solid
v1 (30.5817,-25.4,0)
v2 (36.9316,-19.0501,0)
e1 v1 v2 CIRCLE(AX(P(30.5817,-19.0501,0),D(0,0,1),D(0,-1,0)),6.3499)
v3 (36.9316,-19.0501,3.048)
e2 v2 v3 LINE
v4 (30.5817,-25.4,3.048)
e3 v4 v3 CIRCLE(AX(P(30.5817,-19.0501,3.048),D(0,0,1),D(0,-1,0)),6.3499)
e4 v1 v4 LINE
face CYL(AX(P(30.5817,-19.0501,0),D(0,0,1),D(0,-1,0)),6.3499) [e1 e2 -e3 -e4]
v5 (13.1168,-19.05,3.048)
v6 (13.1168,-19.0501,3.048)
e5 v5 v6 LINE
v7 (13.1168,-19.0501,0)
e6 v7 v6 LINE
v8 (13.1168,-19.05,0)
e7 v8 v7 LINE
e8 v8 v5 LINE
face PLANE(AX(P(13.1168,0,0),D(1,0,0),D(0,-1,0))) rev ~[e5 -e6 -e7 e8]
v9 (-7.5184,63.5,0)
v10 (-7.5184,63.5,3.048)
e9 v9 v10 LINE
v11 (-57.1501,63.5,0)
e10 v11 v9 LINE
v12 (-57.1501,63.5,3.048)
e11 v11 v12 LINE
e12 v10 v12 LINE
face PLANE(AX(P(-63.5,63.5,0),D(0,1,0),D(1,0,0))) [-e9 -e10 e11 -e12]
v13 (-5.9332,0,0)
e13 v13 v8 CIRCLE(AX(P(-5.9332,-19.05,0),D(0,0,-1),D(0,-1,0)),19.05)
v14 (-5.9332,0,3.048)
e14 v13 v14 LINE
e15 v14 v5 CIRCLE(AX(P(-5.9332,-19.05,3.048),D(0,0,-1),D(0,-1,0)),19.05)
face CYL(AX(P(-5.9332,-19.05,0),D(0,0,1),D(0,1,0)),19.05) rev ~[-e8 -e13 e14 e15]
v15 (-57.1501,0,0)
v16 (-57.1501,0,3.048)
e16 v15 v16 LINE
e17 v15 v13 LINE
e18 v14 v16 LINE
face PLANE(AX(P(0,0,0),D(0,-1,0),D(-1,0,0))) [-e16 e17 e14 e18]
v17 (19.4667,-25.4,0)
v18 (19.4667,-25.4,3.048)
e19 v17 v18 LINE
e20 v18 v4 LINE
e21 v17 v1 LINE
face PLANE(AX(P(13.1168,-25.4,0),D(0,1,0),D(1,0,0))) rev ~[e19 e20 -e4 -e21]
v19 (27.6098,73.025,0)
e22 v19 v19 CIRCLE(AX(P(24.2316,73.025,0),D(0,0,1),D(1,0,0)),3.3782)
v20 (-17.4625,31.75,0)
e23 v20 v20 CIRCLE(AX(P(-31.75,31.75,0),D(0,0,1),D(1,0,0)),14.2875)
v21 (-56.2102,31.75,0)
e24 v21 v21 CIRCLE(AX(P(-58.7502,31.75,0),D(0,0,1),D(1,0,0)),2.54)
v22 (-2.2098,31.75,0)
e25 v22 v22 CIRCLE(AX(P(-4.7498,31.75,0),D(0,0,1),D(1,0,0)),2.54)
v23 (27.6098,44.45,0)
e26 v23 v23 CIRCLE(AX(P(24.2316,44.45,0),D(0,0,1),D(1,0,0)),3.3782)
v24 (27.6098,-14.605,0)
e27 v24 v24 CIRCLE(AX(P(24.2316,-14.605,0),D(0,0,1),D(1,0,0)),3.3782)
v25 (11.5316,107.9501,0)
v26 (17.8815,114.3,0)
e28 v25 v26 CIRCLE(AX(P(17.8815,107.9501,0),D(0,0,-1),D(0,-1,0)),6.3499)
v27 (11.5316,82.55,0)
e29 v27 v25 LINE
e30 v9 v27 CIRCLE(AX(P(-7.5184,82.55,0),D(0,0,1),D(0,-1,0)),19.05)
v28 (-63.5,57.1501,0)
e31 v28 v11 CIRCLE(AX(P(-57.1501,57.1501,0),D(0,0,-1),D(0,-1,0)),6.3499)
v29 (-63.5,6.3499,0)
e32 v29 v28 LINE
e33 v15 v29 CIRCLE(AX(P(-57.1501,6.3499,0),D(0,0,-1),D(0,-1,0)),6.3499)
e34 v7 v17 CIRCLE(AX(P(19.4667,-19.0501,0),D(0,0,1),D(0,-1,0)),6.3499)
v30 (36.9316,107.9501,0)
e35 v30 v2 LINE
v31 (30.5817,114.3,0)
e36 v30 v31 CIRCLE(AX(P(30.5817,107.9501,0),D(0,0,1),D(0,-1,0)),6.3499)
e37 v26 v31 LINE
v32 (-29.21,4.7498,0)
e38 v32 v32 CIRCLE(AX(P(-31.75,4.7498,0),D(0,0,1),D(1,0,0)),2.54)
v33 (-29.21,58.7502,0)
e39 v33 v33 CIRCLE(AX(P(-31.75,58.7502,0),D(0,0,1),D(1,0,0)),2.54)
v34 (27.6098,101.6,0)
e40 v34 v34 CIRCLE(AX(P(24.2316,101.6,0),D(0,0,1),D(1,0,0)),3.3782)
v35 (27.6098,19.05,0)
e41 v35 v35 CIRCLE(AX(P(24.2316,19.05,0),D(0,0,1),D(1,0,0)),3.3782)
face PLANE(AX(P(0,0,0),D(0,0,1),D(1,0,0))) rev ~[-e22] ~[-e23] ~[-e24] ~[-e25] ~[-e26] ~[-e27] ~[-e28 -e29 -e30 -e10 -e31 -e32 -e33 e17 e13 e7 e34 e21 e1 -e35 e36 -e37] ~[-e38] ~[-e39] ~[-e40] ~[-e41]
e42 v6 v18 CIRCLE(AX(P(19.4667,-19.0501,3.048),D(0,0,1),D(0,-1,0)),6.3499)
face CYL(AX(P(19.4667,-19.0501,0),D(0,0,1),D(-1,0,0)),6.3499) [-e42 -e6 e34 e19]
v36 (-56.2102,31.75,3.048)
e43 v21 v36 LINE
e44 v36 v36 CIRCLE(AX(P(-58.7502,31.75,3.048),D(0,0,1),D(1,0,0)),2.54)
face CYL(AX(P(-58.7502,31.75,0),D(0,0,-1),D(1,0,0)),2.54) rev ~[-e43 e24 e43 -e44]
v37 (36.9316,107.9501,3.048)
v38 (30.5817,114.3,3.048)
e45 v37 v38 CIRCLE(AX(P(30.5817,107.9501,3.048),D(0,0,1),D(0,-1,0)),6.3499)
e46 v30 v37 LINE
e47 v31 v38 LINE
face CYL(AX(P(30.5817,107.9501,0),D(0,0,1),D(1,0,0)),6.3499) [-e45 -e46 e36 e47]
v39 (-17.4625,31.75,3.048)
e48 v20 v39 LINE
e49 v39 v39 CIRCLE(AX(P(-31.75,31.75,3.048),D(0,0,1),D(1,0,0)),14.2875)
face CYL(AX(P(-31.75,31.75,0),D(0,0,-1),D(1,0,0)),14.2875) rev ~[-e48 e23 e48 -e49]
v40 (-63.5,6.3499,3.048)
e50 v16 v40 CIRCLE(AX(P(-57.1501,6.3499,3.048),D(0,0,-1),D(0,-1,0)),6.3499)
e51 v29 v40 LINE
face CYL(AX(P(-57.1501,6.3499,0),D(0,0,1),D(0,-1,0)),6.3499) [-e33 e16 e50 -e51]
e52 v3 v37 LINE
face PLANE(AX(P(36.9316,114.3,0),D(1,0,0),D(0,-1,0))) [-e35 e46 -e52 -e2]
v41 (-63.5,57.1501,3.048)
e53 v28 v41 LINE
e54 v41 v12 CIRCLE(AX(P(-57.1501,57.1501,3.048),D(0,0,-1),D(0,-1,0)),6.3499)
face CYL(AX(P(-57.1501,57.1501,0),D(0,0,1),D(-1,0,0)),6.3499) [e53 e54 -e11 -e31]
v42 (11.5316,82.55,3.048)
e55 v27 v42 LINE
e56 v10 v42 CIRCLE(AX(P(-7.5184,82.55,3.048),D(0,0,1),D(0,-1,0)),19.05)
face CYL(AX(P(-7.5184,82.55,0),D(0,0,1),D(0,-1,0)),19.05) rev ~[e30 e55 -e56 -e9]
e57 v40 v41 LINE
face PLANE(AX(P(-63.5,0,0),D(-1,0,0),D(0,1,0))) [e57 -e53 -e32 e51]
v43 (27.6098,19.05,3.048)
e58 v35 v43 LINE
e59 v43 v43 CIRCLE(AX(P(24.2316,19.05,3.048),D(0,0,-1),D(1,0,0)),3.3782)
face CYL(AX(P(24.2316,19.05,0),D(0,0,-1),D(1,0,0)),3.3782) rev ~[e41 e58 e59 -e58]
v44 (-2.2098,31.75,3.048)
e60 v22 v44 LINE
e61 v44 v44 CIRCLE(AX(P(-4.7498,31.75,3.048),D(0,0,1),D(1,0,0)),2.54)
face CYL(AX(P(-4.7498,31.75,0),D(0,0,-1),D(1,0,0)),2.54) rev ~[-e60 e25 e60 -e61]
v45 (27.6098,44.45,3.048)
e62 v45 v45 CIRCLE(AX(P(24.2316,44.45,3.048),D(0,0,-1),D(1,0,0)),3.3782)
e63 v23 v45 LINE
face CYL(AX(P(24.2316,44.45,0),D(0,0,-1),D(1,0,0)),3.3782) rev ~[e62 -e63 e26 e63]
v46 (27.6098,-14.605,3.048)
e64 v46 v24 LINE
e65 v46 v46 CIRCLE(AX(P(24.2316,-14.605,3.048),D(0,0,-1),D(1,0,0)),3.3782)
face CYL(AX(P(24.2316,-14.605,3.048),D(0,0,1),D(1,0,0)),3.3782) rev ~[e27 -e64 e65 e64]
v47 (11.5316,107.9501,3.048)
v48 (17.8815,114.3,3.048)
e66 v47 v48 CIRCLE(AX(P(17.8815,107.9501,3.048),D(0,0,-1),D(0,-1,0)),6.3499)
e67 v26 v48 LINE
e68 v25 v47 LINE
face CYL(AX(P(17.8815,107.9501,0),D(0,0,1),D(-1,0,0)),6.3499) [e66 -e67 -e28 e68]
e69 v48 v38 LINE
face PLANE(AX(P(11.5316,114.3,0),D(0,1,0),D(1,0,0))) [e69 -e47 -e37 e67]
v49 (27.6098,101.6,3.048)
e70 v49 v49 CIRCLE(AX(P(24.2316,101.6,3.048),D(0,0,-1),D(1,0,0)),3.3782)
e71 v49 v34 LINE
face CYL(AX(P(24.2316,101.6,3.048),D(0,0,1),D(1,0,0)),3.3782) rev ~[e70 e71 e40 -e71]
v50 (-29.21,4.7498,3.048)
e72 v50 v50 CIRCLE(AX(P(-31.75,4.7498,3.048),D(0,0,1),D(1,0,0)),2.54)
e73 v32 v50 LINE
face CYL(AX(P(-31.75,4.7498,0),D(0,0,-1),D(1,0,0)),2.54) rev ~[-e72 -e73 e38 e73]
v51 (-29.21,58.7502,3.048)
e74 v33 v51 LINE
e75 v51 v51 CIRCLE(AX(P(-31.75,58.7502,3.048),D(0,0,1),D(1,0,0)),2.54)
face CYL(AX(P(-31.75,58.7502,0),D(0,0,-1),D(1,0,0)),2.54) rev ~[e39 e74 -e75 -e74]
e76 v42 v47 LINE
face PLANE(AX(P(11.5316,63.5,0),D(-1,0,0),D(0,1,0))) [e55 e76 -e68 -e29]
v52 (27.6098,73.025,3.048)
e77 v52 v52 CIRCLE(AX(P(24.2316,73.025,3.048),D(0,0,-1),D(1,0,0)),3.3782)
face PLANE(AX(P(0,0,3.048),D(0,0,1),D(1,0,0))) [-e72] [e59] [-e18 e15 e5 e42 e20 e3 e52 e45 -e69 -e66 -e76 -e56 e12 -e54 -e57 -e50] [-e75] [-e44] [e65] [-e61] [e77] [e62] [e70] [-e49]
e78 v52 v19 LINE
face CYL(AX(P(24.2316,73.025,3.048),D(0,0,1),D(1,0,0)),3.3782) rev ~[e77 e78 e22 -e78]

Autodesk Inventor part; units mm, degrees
ref_plane "YZ Plane" through (0, 0, 0) normal (1, 0, 0) x (0, 1, 0)
ref_plane "XZ Plane" through (0, 0, 0) normal (0, 1, 0) x (-1, 0, 0)
ref_plane "XY Plane" through (0, 0, 0) normal (0, 0, 1) x (1, 0, 0)
sketch "Sketch1" plane through (0, 0, 0) normal (0, 0, 1) x (1, 0, 0)
  line L0 (0, 0) -> (-63.5, 0)
  line L1 (-63.5, 0) -> (-63.5, 63.5)
  line L2 (-63.5, 63.5) -> (0, 63.5)
  circle A0 centre (-58.7502, 31.75) radius 2.54
  circle A1 centre (-31.75, 58.7502) radius 2.54
  circle A2 centre (-4.7498, 31.75) radius 2.54
  circle A3 centre (-31.75, 4.7498) radius 2.54
  line L3 (36.9316, 63.5) -> (36.9316, 0)
  line L4 (13.1168, 0) -> (0, 0)
  circle A4 centre (-31.75, 31.75) radius 14.2875
  line L5 (24.2316, 63.5) -> (24.2316, 44.45)
  line L6 (24.2316, 44.45) -> (24.2316, 19.05)
  circle A5 centre (24.2316, 44.45) radius 3.3782
  circle A6 centre (24.2316, 19.05) radius 3.3782
  line L7 (20.8534, 44.45) -> (20.8534, 19.05)
  line L8 (27.6098, 19.05) -> (27.6098, 44.45)
  line L9 (11.5316, 63.5) -> (11.5316, 114.3)
  line L10 (13.1168, 0) -> (13.1168, -25.4)
  line L11 (13.1168, -25.4) -> (36.9316, -25.4)
  line L12 (36.9316, -25.4) -> (36.9316, 0)
  line L13 (11.5316, 114.3) -> (36.9316, 114.3)
  line L14 (36.9316, 114.3) -> (36.9316, 63.5)
  line L15 (0, 63.5) -> (11.5316, 63.5)
  dimension "d0" = 63.5
  dimension "d1" = 63.5
  dimension "d6" = 5.08
  dimension "d7" = 5.08
  dimension "d8" = 5.08
  dimension "d9" = 5.08
  dimension "d11" = 36.9316
  dimension "d12" = 28.575
  dimension "d13" = 12.7
  dimension "d15" = 25.4
  dimension "d16" = 6.7564
  dimension "d17" = 6.7564
  dimension "d23" = 50.8
  dimension "d24" = 25.4
extrude "Plate2" add sketch "Sketch1" along normal blind 3.048 contours L0 L1 L2 L15 L9 L13 L14 L3 L12 L11 L10 L4 | L8 A6 L6 A5 | A5 L6 A6 L7
sketch "Sketch4" plane through (0, 0, 3.048) normal (0, 0, 1) x (1, 0, 0)
  circle A0 centre (24.2316, 19.05) radius 3.3782 projected
  circle A1 centre (24.2316, 44.45) radius 3.3782 projected
  line L0 (-63.5, 63.5) -> (11.5316, 63.5) projected
  line L1 (24.2316, 44.45) -> (24.2316, 101.6)
  circle A2 centre (24.2316, 101.6) radius 3.3782
  circle A3 centre (24.2316, 73.025) radius 3.3782
  line L2 (24.2316, 19.05) -> (24.2316, -14.605)
  circle A4 centre (24.2316, -14.605) radius 3.3782
  point P0 (0, 0)
  point P1 (20.8534, 44.45)
  point P2 (20.8534, 19.05)
  point P3 (27.6098, 19.05)
  point P4 (27.6098, 44.45)
  dimension "d25" = 57.15
  dimension "d26" = 6.7564
  dimension "d27" = 6.7564
  dimension "d28" = 33.655
  dimension "d29" = 6.7564
extrude "Cut1" cut sketch "Sketch4" against normal blind 3.048
fillet "Corner Round1" radius 19.05 2 edges at (11.5316, 63.5, 1.524) (13.1168, 0, 1.524)
fillet "Corner Round2" radius 6.35 6 edges at (-63.5, 63.5, 1.524) (-63.5, 0, 1.524) (13.1168, -25.4, 1.524) (36.9316, -25.4, 1.524) (36.9316, 114.3, 1.524) (11.5316, 114.3, 1.524)
equation "\"d19\" = Thickness"
equation "\"BendRadius\" = Thickness"
equation "\"BendReliefWidth\" = Thickness"
equation "\"BendReliefDepth\" = 0.5 * Thickness"
equation "\"CornerReliefSize\" = 4 * Thickness"
equation "\"MinimumRemnant\" = 2 * Thickness"
equation "\"TransitionRadius\" = BendRadius"
equation "\"JacobiRadiusSize\" = BendRadius"
equation "\"GapSize\" = Thickness"
equation "\"d10\" = BendRadius"
equation "\"d18\" = BendRadius"
equation "\"Thickness\" = 3.048"
properties part number "M - p60 mount plate" material "Aluminum 6061"
